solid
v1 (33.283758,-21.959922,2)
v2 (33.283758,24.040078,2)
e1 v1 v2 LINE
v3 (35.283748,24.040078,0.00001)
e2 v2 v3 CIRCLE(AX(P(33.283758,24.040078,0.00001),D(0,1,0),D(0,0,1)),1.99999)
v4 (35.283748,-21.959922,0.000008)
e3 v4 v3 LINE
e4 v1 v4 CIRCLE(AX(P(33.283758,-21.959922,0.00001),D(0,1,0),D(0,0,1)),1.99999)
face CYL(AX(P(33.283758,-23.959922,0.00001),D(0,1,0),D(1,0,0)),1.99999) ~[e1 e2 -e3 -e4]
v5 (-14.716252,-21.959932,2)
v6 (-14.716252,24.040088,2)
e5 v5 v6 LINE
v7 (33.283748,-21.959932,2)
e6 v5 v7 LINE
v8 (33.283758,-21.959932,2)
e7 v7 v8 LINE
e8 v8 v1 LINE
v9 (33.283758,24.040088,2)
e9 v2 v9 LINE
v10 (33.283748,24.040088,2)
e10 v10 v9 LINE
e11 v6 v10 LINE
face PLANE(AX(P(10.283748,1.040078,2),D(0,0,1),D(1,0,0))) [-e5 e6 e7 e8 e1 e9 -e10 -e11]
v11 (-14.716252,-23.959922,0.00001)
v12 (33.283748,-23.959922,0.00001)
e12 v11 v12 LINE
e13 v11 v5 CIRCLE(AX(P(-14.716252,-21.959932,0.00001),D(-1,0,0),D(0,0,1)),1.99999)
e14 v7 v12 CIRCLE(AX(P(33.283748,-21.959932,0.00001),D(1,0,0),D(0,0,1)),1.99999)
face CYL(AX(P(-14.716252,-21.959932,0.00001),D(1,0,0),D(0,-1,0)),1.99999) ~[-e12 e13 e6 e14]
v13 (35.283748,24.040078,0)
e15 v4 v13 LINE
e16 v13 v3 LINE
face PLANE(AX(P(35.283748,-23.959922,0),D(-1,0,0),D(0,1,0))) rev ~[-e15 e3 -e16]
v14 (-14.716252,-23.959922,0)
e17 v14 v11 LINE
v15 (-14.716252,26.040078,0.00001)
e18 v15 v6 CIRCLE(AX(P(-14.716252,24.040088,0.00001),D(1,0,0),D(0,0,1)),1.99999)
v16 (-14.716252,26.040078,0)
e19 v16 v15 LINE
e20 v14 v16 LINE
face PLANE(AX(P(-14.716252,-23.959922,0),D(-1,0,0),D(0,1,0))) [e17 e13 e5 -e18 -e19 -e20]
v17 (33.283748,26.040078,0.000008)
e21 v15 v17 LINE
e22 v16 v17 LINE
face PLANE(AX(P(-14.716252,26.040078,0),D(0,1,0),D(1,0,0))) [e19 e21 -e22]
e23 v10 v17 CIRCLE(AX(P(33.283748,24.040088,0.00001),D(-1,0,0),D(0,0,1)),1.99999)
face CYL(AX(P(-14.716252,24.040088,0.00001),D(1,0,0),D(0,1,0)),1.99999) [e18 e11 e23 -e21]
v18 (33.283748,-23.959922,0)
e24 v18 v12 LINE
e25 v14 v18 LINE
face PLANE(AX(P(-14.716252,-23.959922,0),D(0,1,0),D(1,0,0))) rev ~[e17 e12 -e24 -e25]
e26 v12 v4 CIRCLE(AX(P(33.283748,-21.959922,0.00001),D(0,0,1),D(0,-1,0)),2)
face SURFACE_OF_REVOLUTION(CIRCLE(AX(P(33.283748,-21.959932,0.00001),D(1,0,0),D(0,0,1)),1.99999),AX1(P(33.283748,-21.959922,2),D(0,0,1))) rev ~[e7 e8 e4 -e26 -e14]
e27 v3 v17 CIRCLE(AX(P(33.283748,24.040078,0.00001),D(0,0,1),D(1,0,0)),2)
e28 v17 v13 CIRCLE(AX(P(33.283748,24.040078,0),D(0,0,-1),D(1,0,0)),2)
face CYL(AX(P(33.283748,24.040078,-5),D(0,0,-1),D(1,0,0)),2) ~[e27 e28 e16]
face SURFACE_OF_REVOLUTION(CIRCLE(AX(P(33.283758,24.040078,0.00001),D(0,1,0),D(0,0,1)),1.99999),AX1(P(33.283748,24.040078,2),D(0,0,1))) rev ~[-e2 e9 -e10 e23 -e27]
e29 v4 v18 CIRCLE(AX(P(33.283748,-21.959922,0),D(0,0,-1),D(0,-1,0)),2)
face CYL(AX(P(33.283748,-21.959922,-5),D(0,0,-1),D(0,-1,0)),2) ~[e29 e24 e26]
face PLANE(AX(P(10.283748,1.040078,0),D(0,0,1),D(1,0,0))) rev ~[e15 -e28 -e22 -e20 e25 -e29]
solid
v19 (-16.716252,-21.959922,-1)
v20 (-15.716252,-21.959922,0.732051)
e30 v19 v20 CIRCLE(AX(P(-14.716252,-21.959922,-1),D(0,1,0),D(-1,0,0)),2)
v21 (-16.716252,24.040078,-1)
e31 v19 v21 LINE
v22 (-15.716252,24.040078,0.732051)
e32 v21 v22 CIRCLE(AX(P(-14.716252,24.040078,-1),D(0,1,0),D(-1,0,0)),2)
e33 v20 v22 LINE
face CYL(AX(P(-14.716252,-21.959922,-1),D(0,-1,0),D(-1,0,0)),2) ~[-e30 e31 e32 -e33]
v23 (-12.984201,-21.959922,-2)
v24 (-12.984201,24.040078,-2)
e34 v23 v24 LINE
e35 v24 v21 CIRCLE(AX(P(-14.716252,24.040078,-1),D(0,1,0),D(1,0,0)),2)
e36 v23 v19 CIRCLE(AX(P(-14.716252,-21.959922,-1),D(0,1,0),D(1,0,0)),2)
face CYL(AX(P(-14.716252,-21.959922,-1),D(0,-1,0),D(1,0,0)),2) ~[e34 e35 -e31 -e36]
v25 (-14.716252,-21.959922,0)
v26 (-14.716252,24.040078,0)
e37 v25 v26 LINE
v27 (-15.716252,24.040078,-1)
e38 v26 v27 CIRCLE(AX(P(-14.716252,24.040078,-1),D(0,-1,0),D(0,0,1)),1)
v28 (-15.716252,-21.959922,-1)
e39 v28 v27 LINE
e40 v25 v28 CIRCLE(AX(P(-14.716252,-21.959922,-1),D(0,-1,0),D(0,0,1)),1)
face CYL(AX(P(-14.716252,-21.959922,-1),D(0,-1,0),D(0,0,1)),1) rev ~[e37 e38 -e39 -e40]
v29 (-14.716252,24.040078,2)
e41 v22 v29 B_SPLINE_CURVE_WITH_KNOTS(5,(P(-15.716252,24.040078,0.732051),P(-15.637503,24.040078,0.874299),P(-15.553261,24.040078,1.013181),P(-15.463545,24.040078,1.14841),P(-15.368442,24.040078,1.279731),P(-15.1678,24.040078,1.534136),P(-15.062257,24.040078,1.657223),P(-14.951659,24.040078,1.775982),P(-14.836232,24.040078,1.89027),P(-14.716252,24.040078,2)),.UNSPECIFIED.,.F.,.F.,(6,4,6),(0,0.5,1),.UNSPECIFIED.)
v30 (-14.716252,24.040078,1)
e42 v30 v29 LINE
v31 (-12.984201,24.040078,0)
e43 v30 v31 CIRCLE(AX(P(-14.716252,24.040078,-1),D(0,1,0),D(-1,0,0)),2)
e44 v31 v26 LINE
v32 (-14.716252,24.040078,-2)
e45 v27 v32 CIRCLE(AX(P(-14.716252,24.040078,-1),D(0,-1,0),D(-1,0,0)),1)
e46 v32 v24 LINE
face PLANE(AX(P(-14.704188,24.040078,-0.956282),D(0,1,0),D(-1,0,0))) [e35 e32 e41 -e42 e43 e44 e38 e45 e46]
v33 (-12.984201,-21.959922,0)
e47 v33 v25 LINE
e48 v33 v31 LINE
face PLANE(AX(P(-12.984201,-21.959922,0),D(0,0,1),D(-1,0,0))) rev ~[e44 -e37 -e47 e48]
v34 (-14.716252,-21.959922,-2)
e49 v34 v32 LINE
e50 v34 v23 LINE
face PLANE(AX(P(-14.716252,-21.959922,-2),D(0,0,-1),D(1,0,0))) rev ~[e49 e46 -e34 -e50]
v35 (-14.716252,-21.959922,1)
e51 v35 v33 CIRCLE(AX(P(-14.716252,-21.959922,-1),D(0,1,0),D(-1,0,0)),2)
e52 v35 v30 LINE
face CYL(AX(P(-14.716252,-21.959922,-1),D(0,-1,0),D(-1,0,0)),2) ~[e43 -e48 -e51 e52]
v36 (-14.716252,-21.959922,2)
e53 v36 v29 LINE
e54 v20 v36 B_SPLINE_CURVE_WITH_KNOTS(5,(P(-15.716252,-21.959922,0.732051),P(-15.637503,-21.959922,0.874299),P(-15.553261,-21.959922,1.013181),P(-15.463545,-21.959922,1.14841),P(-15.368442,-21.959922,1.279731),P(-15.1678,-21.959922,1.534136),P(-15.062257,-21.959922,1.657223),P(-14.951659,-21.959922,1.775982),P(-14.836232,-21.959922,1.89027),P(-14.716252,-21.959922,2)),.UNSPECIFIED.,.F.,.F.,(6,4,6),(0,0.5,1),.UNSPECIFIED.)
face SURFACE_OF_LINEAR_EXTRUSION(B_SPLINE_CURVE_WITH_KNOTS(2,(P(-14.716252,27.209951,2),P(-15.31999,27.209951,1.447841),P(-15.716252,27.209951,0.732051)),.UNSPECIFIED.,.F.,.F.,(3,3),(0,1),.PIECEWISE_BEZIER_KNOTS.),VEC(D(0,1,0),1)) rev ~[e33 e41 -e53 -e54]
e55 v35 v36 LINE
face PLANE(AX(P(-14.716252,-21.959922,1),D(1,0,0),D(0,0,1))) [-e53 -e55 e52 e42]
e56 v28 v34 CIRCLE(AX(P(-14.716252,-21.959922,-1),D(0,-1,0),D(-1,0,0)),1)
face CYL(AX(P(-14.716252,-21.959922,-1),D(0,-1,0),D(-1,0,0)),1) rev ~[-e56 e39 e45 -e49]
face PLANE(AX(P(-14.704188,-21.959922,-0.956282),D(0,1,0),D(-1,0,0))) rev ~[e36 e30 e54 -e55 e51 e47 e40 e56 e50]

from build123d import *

# Parameters (mm, degrees)
F0_W         = 50
F0_H         = 50
F1_DEPTH     = 2
F2_W         = 2
F2_H         = 1
F3_DEPTH     = 25
F5_DEPTH     = 46
F6_DEPTH     = 25
F8_DEPTH     = 46
F10_DEPTH    = 46
F11_T1_DEPTH = 52.3397459622
F12_R        = 1.99999
F13_T1_DEPTH = 7
F13_T4_ANGLE = 90
F13_T6_ANGLE = 90


# Not quite as in the source:
# - a fillet or chamfer that OpenCascade refuses, or shapes differently, is made with other operations: its cross-section is extruded or revolved along the edge and cut away or added
# - a fillet or chamfer is up to 0.001 mm smaller than in the source, because OpenCascade refuses the exact size


with BuildPart() as f1:
    # F0 (on Top) → F1 (new body)
    with BuildSketch(Plane.XY):
        with Locations((10.2837480605, 1.0400783271)):
            Rectangle(F0_W, F0_H)
    extrude(amount=F1_DEPTH)

    # F12 (radius 2 in the source; OpenCascade refuses exactly that, so slightly less here)
    f12_edges = [f1.edges().sort_by_distance(p)[0] for p in [
        (10.283748, -23.959922, 2),
        (35.283748, 1.040078, 2),
        (10.283748, 26.040078, 2),
    ]]
    fillet(f12_edges, radius=F12_R)

    # F13: fillet of radius 2 on 4 edges, made by hand

    # F13_s2 → F13_t1 (cut)
    with BuildSketch(Plane.XY.offset(-5)):
        with BuildLine():
            ThreePointArc((33.2837480605, -23.9599216729), (34.6979616228, -23.3741352353), (35.2837480605, -21.9599216729))
            Line((35.2837480605, -21.9599216729), (35.2837480605, -23.9599216729))
            Line((35.2837480605, -23.9599216729), (33.2837480605, -23.9599216729))
        make_face()
        with BuildLine():
            ThreePointArc((35.2837480605, 24.0400783271), (34.6979616228, 25.4542918894), (33.2837480605, 26.0400783271))
            Line((33.2837480605, 26.0400783271), (35.2837480605, 26.0400783271))
            Line((35.2837480605, 26.0400783271), (35.2837480605, 24.0400783271))
        make_face()
    extrude(amount=F13_T1_DEPTH, mode=Mode.SUBTRACT)

    # F13_s3 → F13_t4 (revolve, cut)
    with BuildSketch(Plane.YZ.offset(33.2837480605)):
        with BuildLine():
            ThreePointArc((-21.9599316729, 2), (-23.3741381642, 1.4142164913), (-23.9599216729, 1e-05))
            Line((-23.9599216729, 1e-05), (-23.9599216729, 2))
            Line((-23.9599216729, 2), (-21.9599316729, 2))
        make_face()
    revolve(axis=Axis((33.2837480605, -21.9599216729, 2), (0, 0, 1)), revolution_arc=F13_T4_ANGLE, mode=Mode.SUBTRACT)

    # F13_s5 → F13_t6 (revolve, cut)
    with BuildSketch(Plane.XZ.offset(-24.0400783271)):
        with BuildLine():
            ThreePointArc((33.2837580605, 2), (34.6979645518, 1.4142164913), (35.2837480605, 1e-05))
            Line((35.2837480605, 1e-05), (35.2837480605, 2))
            Line((35.2837480605, 2), (33.2837580605, 2))
        make_face()
    revolve(axis=Axis((33.2837480605, 24.0400783271, 2), (0, 0, 1)), revolution_arc=F13_T6_ANGLE, mode=Mode.SUBTRACT)


with BuildPart() as f3:
    # F2 (on face) → F3 (new body)
    with BuildSketch(Plane(origin=(-14.7162519395, 0, 0), x_dir=(0, -1, 0), z_dir=(-1, 0, 0))):
        with Locations((22.9599216729, -0.5)):
            Rectangle(F2_W, F2_H)
    extrude(amount=-F3_DEPTH)

    # F6 (cut): a face of the model
    f6_faces = [f3.faces().sort_by_distance(p)[0] for p in [
        (-14.7162519395, -22.9599216729, -0.5),
    ]]
    extrude(f6_faces, amount=-F6_DEPTH, mode=Mode.SUBTRACT)


with BuildPart() as f5:
    # F4 (on face) → F5 (new body)
    with BuildSketch(Plane(origin=(0, -21.9599216729, 0), x_dir=(-1, 0, 0), z_dir=(0, 1, 0))):
        with BuildLine():
            ThreePointArc((14.7162519395, 0), (15.4233587207, -0.2928932188), (15.7162519395, -1))
            ThreePointArc((15.7162519395, -1), (14.7162519395, -2), (13.7162519395, -1))
            Line((13.7162519395, -1), (12.7162519395, -1))
            ThreePointArc((12.7162519395, -1), (14.7162519395, -3), (16.7162519395, -1))
            ThreePointArc((16.7162519395, -1), (15.2338900297, 0.9318516526), (12.984201132, 0))
            Line((12.984201132, 0), (14.7162519395, 0))
        make_face()
        with BuildLine():
            ThreePointArc((13.7162519395, -1), (14.0091451583, -0.2928932188), (14.7162519395, 0))
            Line((14.7162519395, 0), (12.984201132, 0))
            ThreePointArc((12.984201132, 0), (12.784400287, -0.4823619098), (12.7162519395, -1))
            Line((12.7162519395, -1), (13.7162519395, -1))
        make_face()
    extrude(amount=F5_DEPTH)

    # F7 (on face) → F8 (cut)
    with BuildSketch(Plane.XZ.offset(21.9599216729)):
        with BuildLine():
            ThreePointArc((-13.7162519395, -1), (-14.0091451583, -1.7071067812), (-14.7162519395, -2))
            Line((-14.7162519395, -2), (-12.984201132, -2))
            ThreePointArc((-12.984201132, -2), (-12.784400287, -1.5176380902), (-12.7162519395, -1))
            ThreePointArc((-12.7162519395, -1), (-12.784400287, -0.4823619098), (-12.984201132, 0))
            Line((-12.984201132, 0), (-14.7162519395, 0))
            ThreePointArc((-14.7162519395, 0), (-14.0091451583, -0.2928932188), (-13.7162519395, -1))
        make_face()
    extrude(amount=-F8_DEPTH, mode=Mode.SUBTRACT)

    # F9 (on face) → F10 (join)
    with BuildSketch(Plane.XZ.offset(21.9599216729)):
        with BuildLine():
            ThreePointArc((-15.7162519395, 0.7320508076), (-15.2338900297, 0.9318516526), (-14.7162519395, 1))
            Line((-14.7162519395, 1), (-14.7162519395, 2))
            Line((-14.7162519395, 2), (-15.7162519395, 2))
            Line((-15.7162519395, 2), (-15.7162519395, 0.7320508076))
        make_face()
    extrude(amount=-F10_DEPTH)

    # F11: fillet of radius 5 on 1 edges, made by hand

    # F11_s2 → F11_t1 (cut)
    with BuildSketch(Plane.XZ.offset(-27.2099513081)):
        with BuildLine():
            add(Edge.make_bspline(
                [(-14.7162519395, 2), (-15.319989957, 1.4478409987), (-15.7162519395, 0.7320508076)],
                knots=[0, 0, 0, 1, 1, 1], degree=2, weights=[1, 1, 1]))
            Line((-15.7162519395, 0.7320508076), (-15.8037401736, 0.780484359))
            ThreePointArc((-15.8037401736, 0.780484359), (-15.8162519395, 1.3660254038), (-15.8162519395, 2))
            Line((-15.8162519395, 2), (-15.7162519395, 2.1))
            ThreePointArc((-15.7162519395, 2.1), (-15.2162519395, 2.1), (-14.7837401736, 2.0737925353))
            Line((-14.7837401736, 2.0737925353), (-14.7162519395, 2))
        make_face()
    extrude(amount=F11_T1_DEPTH, mode=Mode.SUBTRACT)


solid = Compound([f1.part, f5.part])
